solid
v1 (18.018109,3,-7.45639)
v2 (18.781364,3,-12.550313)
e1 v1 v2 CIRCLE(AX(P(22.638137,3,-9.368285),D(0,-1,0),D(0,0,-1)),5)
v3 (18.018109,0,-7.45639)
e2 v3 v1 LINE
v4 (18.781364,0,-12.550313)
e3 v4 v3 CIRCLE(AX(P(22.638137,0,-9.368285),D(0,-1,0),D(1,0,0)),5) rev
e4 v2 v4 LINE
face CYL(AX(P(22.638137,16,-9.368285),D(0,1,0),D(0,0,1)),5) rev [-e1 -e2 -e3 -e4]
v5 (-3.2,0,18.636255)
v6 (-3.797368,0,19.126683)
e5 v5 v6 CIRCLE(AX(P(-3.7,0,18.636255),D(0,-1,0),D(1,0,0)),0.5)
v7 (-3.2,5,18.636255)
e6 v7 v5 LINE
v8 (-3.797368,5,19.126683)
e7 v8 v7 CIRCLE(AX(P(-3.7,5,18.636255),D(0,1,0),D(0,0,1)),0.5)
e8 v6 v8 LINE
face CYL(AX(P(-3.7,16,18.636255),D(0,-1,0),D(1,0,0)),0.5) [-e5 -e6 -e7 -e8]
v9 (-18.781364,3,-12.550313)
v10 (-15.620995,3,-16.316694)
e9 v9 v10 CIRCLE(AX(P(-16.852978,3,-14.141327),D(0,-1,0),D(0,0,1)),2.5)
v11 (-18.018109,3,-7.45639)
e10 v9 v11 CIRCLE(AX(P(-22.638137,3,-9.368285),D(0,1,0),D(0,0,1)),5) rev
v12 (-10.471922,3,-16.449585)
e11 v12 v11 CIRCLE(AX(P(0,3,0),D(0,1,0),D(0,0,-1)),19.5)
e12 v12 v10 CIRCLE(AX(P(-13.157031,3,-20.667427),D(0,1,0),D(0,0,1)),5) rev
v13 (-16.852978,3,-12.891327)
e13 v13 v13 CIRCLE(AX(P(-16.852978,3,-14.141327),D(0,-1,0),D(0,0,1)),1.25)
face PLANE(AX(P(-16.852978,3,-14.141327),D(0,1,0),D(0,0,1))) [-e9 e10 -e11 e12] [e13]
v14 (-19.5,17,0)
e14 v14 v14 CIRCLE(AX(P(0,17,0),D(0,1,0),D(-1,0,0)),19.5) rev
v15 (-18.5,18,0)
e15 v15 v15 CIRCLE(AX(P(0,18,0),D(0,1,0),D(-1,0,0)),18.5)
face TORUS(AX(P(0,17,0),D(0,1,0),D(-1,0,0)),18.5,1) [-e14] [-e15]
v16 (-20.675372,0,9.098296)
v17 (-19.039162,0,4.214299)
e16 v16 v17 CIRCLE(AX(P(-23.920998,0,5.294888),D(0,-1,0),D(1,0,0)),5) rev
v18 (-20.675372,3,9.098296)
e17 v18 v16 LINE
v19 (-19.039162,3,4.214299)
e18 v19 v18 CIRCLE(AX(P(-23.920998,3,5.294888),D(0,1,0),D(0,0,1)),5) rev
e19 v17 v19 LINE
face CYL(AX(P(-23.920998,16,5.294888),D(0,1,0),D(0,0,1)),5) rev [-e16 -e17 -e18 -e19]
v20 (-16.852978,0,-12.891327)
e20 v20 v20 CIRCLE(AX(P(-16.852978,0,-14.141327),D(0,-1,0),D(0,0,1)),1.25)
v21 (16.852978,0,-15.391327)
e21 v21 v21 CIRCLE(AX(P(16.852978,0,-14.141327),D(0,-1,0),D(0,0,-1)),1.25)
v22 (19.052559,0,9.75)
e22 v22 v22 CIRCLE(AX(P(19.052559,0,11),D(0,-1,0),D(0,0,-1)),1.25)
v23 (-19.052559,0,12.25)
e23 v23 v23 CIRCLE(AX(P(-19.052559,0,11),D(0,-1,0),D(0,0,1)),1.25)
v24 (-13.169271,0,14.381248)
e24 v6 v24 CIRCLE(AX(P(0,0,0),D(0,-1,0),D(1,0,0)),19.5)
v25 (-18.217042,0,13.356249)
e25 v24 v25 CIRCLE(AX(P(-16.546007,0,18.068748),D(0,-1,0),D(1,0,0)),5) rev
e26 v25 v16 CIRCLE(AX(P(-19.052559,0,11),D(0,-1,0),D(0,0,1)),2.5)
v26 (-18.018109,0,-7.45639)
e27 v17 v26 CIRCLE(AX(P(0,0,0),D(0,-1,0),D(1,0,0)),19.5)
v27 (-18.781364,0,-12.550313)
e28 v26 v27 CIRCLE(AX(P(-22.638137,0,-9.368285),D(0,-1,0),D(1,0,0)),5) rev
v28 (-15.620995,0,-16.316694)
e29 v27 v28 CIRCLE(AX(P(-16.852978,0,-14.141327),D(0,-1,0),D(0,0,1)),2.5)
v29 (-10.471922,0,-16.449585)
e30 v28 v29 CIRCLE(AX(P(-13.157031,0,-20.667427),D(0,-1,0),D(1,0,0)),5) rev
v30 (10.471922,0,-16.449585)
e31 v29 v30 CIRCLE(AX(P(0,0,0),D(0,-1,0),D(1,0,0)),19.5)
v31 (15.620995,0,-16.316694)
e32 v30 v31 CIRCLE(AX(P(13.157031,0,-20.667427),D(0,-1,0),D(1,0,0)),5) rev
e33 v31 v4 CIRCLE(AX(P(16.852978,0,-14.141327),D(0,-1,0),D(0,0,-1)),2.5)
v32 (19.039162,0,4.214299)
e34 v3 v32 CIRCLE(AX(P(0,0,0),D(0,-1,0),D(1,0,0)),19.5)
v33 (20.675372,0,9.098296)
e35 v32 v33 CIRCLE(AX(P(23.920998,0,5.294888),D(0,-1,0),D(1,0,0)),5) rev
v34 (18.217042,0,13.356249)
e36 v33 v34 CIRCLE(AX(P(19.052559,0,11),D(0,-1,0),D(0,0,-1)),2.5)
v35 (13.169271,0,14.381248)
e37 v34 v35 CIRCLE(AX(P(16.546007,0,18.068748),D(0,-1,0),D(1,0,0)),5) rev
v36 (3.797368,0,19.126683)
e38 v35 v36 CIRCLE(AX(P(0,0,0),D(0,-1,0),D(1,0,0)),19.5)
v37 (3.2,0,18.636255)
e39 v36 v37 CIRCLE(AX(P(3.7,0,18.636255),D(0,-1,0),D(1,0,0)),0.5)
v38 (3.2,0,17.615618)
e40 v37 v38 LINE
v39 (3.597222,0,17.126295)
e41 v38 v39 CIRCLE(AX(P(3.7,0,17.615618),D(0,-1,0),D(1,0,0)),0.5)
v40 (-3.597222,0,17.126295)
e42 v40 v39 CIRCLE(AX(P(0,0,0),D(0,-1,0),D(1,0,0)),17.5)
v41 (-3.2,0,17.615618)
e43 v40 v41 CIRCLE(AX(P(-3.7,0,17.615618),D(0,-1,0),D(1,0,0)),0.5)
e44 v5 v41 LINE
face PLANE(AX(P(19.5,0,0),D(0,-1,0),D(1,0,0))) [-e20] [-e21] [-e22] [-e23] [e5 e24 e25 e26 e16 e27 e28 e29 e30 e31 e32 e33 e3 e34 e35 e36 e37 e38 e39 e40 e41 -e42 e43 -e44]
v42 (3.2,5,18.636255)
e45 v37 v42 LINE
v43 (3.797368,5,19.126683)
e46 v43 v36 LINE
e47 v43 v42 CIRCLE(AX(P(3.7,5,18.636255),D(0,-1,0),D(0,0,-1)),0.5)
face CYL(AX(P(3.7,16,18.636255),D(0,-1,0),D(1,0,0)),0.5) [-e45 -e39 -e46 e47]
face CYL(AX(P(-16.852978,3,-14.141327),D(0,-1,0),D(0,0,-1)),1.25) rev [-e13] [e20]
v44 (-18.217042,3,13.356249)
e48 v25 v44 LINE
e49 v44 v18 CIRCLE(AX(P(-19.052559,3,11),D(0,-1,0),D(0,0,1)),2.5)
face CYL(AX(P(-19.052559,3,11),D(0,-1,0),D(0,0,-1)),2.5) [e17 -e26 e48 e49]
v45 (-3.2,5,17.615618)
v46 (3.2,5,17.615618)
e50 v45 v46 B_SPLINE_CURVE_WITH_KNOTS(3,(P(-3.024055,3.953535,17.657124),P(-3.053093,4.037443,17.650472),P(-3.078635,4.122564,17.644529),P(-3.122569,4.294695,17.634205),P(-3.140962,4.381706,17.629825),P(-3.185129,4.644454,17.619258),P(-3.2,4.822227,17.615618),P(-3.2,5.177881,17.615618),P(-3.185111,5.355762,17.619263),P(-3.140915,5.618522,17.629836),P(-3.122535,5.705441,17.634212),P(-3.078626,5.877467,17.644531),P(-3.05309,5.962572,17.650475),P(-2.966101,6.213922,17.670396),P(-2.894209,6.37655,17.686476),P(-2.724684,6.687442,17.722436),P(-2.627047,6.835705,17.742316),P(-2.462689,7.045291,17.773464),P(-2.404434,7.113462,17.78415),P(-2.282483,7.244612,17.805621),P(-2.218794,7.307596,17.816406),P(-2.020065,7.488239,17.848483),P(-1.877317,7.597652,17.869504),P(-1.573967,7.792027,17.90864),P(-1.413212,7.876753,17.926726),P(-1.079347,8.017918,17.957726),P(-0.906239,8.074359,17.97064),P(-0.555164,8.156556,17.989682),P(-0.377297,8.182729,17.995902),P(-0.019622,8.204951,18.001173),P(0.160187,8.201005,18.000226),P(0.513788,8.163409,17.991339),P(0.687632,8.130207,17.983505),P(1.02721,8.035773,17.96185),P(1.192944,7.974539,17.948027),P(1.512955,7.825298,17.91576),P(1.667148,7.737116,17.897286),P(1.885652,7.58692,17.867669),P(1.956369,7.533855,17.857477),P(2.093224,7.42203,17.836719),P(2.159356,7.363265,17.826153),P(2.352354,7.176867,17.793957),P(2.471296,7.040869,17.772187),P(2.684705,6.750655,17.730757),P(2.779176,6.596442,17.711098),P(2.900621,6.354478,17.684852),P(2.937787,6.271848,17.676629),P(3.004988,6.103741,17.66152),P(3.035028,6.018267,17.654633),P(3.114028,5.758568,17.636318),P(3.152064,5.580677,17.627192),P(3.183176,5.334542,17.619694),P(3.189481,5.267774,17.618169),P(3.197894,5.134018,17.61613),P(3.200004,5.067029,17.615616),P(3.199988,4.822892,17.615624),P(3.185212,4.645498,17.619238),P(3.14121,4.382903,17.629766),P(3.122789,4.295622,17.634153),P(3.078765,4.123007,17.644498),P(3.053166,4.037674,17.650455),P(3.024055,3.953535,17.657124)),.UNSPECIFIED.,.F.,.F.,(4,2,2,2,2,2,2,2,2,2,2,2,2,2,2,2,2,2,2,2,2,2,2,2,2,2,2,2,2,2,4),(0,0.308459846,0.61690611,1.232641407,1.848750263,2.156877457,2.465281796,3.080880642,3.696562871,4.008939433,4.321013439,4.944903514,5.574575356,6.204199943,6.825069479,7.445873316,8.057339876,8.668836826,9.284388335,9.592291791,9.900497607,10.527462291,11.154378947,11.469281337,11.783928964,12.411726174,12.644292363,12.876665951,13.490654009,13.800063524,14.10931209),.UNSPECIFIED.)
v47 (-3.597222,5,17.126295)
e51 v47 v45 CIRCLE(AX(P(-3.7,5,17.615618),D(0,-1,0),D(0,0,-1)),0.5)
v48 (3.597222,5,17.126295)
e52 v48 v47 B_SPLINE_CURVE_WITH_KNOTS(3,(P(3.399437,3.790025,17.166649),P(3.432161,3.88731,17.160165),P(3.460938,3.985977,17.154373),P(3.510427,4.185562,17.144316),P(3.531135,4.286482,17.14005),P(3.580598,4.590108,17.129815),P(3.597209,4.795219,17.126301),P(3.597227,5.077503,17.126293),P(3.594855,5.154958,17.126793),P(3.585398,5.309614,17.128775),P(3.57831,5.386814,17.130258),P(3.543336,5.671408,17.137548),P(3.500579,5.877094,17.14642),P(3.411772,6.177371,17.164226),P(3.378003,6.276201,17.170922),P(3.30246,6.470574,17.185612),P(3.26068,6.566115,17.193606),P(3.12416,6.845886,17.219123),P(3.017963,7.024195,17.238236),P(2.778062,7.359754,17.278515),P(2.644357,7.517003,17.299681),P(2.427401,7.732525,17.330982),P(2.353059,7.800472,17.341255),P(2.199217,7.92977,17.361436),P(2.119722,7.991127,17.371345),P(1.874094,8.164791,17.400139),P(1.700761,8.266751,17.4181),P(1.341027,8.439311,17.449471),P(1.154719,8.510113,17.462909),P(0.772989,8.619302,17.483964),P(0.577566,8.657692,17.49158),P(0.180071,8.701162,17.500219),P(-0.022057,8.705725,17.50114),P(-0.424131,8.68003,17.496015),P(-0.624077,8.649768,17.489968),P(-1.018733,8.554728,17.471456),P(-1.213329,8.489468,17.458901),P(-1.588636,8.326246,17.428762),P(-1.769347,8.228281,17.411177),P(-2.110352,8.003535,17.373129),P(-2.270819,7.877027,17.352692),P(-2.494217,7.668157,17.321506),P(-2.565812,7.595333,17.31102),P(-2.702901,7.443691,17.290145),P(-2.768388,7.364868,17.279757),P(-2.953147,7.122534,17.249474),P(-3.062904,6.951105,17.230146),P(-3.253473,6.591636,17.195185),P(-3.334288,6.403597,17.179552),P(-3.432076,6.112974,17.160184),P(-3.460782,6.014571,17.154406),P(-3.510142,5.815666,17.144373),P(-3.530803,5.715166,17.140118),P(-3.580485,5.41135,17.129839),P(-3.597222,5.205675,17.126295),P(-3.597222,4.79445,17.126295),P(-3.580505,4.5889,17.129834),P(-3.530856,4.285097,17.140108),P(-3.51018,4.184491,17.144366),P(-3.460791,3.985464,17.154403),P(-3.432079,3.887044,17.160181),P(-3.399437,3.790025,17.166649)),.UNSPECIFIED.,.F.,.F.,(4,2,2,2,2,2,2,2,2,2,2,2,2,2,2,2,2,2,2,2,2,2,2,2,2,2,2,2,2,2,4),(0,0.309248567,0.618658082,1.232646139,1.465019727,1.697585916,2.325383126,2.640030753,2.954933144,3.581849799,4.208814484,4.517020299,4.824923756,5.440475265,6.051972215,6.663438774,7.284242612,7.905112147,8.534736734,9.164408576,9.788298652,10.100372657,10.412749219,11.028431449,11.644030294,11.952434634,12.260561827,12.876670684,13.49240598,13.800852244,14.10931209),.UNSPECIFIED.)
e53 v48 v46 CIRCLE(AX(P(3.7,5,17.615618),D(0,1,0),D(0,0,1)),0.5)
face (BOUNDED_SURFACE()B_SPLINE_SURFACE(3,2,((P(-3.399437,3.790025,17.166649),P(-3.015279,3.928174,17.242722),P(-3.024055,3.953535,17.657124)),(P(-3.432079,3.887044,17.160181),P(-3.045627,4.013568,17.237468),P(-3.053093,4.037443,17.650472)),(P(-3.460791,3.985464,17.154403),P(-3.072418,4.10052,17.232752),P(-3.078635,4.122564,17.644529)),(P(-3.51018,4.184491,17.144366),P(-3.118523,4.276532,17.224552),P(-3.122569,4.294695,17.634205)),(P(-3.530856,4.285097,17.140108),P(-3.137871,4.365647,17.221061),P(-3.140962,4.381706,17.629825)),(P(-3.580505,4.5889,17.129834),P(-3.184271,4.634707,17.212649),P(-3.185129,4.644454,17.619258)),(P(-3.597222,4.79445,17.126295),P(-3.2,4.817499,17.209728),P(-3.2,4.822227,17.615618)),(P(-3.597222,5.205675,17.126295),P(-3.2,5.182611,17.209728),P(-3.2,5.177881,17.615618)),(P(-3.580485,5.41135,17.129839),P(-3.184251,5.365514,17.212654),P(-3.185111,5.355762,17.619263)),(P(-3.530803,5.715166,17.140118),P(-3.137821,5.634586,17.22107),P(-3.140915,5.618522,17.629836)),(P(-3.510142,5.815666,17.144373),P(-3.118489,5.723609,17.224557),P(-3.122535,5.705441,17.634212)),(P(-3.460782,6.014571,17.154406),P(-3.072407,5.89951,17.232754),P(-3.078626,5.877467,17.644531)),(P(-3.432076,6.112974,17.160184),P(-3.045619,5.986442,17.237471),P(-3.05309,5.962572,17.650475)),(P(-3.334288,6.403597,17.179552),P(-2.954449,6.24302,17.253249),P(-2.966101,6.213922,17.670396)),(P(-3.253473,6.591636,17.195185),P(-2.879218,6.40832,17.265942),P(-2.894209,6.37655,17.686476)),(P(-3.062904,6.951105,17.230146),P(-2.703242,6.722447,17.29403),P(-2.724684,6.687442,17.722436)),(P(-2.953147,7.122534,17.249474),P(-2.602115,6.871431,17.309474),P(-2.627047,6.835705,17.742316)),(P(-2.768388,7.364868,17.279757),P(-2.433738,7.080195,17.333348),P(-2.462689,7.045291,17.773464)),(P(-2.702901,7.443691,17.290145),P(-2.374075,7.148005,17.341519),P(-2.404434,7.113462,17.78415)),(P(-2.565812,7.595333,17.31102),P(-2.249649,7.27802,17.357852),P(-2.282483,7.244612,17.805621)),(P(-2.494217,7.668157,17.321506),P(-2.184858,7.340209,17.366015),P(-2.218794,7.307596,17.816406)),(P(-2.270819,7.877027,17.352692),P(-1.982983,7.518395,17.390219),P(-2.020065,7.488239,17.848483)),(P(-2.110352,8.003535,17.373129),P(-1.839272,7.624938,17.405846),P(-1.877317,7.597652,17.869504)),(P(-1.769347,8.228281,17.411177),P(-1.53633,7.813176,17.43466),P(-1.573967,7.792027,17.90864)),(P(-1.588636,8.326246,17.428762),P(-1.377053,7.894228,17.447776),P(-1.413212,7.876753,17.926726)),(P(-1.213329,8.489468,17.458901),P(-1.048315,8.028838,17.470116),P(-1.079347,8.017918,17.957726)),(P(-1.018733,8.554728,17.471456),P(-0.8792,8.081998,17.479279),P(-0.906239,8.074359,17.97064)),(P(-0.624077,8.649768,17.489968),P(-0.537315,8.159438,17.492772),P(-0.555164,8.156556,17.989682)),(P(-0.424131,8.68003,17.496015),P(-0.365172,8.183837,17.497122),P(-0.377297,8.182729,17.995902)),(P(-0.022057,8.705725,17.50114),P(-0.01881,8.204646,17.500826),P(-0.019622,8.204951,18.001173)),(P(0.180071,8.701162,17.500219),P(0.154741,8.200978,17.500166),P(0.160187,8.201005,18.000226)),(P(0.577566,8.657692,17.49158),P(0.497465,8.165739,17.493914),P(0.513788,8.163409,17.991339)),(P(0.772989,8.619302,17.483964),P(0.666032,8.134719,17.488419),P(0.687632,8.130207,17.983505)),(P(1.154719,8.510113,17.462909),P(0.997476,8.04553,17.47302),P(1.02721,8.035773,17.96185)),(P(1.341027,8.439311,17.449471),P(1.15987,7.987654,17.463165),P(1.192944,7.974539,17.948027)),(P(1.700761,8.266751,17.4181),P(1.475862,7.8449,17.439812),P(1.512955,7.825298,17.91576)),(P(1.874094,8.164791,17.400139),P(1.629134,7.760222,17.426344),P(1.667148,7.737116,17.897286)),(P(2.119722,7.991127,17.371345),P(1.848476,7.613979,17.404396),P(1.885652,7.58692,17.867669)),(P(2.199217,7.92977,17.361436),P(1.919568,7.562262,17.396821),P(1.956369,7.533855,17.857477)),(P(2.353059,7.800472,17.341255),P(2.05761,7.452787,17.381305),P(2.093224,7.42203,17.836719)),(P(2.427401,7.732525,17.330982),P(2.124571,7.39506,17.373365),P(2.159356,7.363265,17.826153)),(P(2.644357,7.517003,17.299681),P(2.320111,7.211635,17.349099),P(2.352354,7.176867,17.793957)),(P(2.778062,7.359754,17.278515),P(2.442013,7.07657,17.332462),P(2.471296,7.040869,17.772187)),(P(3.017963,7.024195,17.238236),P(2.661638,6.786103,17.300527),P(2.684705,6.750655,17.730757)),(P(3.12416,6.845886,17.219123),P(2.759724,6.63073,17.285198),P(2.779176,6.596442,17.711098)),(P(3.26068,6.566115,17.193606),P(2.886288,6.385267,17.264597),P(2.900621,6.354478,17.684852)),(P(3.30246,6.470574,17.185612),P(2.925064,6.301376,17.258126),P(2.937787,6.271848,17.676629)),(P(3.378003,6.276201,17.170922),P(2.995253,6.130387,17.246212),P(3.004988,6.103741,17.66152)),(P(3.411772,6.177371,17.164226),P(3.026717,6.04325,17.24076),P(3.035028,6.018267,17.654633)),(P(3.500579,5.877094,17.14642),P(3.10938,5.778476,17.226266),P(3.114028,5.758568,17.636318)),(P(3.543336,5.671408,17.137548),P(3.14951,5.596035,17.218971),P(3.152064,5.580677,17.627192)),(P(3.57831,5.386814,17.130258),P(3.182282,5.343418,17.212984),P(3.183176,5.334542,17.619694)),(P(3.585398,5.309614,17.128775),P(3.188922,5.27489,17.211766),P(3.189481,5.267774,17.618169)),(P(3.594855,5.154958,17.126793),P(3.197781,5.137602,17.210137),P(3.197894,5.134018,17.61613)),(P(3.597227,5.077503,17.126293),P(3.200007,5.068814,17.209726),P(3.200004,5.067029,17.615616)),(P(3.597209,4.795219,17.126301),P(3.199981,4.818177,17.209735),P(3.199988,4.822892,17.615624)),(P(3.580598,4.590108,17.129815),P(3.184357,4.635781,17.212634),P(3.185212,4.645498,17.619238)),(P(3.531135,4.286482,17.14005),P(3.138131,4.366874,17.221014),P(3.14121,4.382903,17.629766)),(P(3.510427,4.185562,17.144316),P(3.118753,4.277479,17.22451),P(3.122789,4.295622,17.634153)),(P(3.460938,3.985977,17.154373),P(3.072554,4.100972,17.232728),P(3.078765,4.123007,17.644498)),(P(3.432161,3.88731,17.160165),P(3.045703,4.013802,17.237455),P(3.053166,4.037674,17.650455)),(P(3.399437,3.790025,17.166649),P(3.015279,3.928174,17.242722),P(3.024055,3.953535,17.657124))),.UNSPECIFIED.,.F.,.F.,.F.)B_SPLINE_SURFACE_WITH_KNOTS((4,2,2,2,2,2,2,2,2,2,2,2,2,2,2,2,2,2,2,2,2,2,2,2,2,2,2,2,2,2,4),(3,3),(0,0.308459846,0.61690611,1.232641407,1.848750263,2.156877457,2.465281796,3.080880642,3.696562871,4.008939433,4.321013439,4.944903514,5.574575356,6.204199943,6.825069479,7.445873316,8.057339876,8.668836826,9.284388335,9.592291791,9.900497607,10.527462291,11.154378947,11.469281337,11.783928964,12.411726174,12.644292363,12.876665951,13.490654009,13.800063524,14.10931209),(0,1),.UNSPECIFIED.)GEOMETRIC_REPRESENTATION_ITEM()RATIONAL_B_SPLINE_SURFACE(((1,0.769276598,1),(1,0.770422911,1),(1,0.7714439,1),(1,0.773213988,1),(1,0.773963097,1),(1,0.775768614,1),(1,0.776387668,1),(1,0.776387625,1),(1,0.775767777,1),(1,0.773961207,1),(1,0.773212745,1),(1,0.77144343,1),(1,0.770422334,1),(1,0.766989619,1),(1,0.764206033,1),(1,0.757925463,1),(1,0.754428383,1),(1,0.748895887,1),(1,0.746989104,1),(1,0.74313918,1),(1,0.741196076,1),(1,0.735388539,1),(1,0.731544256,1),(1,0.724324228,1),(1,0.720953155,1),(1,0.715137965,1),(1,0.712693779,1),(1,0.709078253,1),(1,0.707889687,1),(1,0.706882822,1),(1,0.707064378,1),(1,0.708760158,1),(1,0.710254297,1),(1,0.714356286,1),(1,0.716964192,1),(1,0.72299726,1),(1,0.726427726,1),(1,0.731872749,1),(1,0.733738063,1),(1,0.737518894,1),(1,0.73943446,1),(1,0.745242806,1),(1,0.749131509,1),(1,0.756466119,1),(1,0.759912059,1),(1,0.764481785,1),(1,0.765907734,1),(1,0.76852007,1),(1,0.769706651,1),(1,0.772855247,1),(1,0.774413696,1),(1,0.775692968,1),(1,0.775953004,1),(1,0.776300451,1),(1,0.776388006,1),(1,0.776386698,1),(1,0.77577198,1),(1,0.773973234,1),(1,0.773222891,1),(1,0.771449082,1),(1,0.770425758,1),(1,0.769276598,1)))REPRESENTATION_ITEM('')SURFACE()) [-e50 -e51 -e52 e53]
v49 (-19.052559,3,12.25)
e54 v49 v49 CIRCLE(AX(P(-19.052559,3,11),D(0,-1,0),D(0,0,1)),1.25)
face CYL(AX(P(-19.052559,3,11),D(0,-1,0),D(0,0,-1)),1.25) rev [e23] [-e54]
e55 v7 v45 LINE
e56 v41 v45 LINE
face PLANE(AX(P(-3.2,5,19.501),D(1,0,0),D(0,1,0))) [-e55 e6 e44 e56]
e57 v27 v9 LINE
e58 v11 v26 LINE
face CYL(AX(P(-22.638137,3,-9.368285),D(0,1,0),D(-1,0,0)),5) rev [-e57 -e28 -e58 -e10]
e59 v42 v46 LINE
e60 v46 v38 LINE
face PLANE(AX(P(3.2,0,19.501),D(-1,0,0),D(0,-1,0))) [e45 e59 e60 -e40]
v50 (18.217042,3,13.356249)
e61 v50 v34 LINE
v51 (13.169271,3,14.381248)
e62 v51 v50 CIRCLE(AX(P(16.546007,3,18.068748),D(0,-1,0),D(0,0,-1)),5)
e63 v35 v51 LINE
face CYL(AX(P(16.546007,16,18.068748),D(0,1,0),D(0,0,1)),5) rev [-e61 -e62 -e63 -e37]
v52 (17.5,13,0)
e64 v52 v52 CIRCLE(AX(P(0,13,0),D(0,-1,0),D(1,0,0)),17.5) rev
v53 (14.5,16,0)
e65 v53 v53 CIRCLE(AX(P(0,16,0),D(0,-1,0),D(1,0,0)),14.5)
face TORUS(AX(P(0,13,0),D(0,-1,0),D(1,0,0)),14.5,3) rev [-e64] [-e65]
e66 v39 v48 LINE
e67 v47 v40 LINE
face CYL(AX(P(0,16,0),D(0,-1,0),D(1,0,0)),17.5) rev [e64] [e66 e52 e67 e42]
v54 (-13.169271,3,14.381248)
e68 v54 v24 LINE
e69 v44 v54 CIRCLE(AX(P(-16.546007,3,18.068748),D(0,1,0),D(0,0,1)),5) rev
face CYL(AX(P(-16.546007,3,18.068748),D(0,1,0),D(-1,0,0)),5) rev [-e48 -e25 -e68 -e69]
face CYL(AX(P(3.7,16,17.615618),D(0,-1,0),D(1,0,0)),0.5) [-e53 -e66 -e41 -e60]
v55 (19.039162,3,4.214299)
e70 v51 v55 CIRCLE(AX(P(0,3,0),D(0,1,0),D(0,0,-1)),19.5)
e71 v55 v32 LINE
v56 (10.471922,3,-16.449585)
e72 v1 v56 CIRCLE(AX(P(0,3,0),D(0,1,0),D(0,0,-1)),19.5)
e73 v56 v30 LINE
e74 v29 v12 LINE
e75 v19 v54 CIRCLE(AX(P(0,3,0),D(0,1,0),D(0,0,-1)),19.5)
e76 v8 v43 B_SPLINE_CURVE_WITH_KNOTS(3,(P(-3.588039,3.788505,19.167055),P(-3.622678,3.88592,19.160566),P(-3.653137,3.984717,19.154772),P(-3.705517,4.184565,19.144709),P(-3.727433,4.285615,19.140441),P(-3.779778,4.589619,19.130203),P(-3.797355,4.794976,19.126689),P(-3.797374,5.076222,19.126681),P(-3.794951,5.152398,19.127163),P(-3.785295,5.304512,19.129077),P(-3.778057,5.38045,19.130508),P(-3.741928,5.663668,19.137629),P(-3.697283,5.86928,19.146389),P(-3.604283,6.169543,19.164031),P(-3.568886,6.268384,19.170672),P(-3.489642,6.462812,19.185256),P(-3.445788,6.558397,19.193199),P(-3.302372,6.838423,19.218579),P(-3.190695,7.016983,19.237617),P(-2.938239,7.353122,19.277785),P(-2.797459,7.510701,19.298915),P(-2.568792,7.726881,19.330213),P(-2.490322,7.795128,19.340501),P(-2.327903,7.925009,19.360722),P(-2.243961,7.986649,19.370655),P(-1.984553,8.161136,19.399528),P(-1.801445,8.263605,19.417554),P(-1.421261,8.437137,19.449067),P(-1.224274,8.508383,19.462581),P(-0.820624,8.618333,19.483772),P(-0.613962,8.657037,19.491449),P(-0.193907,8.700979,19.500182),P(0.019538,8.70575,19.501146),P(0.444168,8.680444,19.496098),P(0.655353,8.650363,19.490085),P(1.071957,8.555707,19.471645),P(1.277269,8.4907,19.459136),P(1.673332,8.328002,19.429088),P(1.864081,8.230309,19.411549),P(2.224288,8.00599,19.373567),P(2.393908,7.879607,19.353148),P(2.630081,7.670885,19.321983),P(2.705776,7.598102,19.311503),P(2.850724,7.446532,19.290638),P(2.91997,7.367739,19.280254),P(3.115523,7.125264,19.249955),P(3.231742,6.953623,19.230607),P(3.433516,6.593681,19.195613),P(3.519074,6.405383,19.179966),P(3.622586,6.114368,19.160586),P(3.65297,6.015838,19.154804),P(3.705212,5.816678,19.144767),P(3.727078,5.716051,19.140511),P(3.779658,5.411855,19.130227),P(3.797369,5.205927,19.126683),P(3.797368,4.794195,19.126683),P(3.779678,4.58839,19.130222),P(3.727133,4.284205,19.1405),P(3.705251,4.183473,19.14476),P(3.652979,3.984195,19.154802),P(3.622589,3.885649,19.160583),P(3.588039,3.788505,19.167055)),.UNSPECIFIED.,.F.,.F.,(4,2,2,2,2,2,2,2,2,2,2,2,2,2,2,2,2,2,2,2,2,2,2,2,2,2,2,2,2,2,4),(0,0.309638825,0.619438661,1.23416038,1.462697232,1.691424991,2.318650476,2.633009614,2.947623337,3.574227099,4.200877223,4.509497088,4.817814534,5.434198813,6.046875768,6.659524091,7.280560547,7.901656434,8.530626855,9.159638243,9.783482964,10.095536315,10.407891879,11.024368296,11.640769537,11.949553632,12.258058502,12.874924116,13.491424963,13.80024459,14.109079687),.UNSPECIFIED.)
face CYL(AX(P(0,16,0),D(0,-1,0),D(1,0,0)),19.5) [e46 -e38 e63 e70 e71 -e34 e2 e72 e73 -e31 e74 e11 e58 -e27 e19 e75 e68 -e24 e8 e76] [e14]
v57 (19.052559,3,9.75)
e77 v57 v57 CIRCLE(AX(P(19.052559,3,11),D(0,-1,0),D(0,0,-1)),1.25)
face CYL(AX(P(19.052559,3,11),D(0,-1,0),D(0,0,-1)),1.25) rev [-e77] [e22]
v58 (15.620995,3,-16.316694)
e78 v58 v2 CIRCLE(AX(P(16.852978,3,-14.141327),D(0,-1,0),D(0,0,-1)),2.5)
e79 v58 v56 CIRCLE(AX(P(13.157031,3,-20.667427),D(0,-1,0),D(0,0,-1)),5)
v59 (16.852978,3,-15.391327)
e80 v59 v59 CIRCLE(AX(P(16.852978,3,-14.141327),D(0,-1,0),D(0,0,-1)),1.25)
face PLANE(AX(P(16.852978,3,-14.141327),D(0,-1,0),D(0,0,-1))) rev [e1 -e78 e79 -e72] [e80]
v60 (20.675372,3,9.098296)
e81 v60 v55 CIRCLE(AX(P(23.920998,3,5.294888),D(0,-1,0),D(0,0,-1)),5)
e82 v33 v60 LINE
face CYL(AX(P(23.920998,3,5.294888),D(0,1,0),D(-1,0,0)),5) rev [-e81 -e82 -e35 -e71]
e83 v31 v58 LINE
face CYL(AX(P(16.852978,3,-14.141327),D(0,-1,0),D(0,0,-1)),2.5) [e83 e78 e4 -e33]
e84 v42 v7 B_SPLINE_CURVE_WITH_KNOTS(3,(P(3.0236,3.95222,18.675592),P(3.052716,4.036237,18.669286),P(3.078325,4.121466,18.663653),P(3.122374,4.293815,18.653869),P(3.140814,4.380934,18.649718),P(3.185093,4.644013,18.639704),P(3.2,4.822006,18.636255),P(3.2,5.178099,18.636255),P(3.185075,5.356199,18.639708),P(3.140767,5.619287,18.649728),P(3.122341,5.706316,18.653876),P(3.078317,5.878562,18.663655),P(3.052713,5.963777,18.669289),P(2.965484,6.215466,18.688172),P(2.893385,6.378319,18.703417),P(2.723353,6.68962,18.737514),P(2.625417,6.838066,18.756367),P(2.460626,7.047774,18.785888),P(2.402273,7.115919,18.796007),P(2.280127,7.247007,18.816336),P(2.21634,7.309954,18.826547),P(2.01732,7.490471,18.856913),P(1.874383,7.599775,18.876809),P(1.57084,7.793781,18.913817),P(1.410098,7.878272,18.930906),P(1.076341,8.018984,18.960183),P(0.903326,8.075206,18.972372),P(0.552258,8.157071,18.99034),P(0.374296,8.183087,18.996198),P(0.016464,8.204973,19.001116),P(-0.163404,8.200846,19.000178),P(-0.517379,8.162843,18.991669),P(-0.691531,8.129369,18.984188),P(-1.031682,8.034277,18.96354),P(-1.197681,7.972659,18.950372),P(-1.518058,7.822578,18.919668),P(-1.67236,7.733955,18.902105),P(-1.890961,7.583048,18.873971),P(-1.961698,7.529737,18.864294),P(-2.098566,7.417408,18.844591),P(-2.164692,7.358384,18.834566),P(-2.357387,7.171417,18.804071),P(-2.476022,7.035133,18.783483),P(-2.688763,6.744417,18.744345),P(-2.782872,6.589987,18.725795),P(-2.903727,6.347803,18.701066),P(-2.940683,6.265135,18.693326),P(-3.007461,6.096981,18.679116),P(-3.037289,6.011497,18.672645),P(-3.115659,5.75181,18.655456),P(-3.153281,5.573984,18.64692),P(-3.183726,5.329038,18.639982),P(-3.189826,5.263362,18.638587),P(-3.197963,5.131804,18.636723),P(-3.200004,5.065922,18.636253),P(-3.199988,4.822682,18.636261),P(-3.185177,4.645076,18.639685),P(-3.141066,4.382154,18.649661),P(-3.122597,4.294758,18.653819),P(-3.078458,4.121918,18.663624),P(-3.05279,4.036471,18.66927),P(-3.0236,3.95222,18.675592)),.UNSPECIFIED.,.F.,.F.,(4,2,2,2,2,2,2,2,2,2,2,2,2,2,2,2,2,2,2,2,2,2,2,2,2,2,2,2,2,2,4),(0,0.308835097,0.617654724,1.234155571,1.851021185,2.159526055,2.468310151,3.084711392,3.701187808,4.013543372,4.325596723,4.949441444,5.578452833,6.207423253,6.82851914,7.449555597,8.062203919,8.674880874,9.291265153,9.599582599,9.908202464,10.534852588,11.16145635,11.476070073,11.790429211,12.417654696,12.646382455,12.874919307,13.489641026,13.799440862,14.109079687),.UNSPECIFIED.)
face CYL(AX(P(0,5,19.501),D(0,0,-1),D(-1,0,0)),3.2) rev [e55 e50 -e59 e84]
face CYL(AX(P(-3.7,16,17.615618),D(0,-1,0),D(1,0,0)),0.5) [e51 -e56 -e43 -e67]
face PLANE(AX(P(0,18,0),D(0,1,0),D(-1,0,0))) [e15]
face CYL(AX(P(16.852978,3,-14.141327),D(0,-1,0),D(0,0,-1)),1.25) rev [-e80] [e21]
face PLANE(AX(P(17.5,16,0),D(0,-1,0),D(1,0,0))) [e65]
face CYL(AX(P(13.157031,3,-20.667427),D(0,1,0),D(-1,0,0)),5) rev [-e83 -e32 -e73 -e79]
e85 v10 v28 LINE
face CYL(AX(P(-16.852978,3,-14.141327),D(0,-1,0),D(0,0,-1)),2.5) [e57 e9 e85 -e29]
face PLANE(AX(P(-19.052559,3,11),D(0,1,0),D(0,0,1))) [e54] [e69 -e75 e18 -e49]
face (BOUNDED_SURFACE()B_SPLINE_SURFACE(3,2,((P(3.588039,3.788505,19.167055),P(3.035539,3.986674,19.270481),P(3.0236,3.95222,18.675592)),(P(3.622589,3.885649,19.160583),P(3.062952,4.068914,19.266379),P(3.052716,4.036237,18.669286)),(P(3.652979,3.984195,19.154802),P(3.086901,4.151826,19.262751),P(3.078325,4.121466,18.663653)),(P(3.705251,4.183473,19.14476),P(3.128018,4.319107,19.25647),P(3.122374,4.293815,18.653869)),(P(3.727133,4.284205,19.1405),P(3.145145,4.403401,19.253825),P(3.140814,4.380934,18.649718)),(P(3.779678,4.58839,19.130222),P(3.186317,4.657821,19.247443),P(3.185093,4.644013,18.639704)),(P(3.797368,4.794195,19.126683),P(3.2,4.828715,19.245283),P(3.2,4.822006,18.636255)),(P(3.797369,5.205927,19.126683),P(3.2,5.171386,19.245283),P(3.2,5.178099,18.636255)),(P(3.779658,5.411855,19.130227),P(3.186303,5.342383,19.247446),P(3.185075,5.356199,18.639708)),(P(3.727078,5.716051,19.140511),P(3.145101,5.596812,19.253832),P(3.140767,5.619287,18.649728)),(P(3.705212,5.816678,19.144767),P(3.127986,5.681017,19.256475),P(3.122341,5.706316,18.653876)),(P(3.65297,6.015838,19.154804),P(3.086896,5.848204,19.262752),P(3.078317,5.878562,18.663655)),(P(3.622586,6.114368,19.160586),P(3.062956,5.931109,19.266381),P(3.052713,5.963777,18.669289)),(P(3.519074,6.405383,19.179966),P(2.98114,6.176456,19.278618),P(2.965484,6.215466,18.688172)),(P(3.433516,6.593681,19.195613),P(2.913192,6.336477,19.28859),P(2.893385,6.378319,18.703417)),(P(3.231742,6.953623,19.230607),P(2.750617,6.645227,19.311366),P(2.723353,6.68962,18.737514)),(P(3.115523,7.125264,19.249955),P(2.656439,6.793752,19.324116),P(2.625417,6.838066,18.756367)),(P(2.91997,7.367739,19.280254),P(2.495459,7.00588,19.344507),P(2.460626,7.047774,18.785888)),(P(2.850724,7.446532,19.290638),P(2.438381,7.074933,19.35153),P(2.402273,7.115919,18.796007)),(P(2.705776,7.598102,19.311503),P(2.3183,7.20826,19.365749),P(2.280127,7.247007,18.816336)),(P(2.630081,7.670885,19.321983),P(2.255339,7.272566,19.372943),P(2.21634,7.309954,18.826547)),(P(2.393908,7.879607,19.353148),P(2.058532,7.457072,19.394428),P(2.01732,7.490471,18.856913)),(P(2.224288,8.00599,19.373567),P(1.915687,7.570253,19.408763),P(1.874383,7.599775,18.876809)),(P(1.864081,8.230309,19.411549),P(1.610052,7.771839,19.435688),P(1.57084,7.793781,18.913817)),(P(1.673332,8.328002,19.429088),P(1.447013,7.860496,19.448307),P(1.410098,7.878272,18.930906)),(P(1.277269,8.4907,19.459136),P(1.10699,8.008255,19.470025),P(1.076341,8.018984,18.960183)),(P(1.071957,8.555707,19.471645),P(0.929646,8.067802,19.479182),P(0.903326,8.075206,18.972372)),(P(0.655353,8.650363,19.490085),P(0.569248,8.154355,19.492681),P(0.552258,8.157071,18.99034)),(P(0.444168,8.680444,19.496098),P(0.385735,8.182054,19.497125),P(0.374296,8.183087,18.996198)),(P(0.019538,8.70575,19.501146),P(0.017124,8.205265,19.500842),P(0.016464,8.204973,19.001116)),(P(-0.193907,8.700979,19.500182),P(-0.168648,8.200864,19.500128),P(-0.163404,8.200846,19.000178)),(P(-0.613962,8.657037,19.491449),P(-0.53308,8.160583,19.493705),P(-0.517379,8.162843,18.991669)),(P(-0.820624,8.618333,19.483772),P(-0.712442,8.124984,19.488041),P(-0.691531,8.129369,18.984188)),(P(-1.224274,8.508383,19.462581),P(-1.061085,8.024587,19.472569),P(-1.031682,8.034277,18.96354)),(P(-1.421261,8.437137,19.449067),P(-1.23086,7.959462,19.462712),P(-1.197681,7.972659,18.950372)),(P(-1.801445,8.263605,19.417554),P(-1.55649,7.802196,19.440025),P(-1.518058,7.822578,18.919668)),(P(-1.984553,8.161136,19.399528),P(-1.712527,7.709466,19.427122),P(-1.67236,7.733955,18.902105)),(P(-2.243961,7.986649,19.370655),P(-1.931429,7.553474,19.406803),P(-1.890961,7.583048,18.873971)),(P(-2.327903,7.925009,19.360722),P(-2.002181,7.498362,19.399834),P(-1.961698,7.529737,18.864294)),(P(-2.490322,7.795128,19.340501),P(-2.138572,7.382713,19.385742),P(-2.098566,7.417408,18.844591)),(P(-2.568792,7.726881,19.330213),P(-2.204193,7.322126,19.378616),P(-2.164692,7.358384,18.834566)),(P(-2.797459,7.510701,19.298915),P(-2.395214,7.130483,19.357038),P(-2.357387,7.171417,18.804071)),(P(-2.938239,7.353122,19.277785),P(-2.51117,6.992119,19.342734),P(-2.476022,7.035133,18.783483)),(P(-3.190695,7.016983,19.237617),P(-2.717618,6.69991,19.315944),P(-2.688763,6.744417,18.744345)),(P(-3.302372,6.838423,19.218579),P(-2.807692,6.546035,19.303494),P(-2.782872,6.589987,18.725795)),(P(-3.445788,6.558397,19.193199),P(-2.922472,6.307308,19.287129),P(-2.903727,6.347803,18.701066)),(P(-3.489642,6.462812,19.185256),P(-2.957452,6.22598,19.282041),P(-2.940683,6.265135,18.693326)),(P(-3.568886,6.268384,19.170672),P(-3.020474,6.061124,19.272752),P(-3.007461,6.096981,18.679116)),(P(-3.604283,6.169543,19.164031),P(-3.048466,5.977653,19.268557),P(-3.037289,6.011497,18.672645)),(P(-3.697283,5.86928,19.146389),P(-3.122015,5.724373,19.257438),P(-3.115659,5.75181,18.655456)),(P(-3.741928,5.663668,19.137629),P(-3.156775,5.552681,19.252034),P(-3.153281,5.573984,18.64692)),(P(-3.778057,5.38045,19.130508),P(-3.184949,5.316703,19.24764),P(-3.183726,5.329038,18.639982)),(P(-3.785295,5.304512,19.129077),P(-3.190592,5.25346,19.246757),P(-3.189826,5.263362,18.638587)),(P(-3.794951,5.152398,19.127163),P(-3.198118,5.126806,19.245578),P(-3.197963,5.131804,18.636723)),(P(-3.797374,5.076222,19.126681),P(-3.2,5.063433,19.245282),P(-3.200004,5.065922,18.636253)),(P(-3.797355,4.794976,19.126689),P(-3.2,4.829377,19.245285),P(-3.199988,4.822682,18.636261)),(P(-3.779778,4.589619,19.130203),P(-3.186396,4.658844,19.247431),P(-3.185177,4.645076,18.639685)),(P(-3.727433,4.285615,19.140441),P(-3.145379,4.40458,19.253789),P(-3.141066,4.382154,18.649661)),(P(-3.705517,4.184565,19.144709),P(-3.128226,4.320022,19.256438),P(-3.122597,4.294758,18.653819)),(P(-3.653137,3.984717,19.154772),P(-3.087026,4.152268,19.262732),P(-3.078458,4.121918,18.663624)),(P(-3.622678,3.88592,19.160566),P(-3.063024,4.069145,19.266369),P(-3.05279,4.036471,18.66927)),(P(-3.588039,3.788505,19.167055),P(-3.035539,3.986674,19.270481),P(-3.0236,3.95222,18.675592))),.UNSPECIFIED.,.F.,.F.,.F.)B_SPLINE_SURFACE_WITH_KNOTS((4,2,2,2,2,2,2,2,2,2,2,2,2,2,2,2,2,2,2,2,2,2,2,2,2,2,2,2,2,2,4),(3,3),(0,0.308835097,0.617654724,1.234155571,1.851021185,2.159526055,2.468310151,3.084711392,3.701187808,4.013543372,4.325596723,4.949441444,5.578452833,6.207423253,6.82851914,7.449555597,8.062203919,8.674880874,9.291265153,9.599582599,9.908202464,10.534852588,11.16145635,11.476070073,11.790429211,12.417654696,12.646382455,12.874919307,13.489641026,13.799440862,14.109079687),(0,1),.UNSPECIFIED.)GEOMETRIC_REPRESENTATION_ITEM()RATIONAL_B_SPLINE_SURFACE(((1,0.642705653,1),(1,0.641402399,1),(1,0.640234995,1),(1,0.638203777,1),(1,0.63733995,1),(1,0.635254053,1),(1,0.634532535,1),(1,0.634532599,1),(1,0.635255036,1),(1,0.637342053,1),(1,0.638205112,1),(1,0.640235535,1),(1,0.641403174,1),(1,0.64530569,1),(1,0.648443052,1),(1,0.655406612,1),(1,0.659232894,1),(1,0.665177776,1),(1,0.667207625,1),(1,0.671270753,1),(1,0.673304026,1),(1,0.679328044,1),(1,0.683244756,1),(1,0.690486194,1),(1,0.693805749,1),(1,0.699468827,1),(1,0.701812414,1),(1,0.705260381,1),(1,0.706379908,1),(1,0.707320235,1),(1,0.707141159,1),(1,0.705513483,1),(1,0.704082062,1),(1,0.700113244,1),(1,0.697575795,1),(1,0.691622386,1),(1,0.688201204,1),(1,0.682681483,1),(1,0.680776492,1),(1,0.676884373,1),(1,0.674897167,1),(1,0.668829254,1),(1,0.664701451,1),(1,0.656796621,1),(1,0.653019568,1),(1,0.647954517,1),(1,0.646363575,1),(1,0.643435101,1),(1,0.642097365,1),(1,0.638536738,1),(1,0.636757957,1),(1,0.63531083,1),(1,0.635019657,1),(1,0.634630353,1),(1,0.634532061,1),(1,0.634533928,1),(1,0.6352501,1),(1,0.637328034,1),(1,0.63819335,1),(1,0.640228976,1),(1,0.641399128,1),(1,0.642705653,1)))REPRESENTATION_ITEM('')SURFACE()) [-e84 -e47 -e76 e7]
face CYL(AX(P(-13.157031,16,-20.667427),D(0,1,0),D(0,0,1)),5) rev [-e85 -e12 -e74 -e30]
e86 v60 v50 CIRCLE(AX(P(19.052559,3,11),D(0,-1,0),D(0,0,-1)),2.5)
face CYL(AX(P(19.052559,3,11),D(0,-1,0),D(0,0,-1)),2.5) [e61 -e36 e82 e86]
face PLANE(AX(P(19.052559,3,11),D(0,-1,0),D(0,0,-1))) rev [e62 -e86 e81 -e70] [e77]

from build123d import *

# Parameters (mm, degrees)
SKETCH_2_R                  = 1.25
EXTRUDE_1491_DEPTH          = 3
FILLET_2_R                  = 3
FILLET_1631_R               = 5
CUT_EXTRUDE_2422_REACH      = 36.187
CUT_EXTRUDE_2422_END_RADIUS = 19.5
FILLET_4_R                  = 0.5
FILLET_5_R                  = 1


with BuildPart() as part:
    # Эскиз1 → Повернуть1 (revolve)
    with BuildSketch(Plane.XY):
        Polygon((0, 16), (0, 18), (19.5, 18), (19.5, 0), (17.5, 0), (17.5, 16), align=None)
    revolve(axis=Axis((0, 16, 0), (0, 1, 0)))

    # Эскиз2 → Extrude 1491 (add)
    # profile 1 of 4: a face of its own
    with BuildSketch(Plane.XZ):
        with BuildLine():
            Line((15.246008724, -16.056438521), (13.207625443, -14.346031861))
            ThreePointArc((13.207625443, -14.346031861), (14.937866641, -12.534358389), (16.421563491, -10.515809646))
            Line((16.421563491, -10.515809646), (18.459946773, -12.226216305))
            ThreePointArc((18.459946773, -12.226216305), (18.768088856, -15.748296437), (15.246008724, -16.056438521))
        make_face()
        with Locations(Location((16.852977749, -14.141327413, 0), (0, 0, 270))):
            Circle(SKETCH_2_R, mode=Mode.SUBTRACT)
    # profile 2 of 4: a face of its own
    with BuildSketch(Plane.XZ):
        with BuildLine():
            Line((-18.459946773, -12.226216305), (-16.421563491, -10.515809646))
            ThreePointArc((-16.421563491, -10.515809646), (-14.937866641, -12.534358389), (-13.207625443, -14.346031861))
            Line((-13.207625443, -14.346031861), (-15.246008724, -16.056438521))
            ThreePointArc((-15.246008724, -16.056438521), (-18.768088856, -15.748296437), (-18.459946773, -12.226216305))
        make_face()
        with Locations(Location((-16.852977749, -14.141327413, 0), (0, 0, 90))):
            Circle(SKETCH_2_R, mode=Mode.SUBTRACT)
    # profile 3 of 4: a face of its own
    with BuildSketch(Plane.XZ):
        with BuildLine():
            Line((17.802558883, 13.165063509), (15.498134224, 11.834603312))
            ThreePointArc((15.498134224, 11.834603312), (16.887495374, 9.75), (17.998134224, 7.504476293))
            Line((17.998134224, 7.504476293), (20.302558883, 8.834936491))
            ThreePointArc((20.302558883, 8.834936491), (21.217622393, 12.25), (17.802558883, 13.165063509))
        make_face()
        with Locations(Location((19.052558883, 11, 0), (0, 0, 270))):
            Circle(SKETCH_2_R, mode=Mode.SUBTRACT)
    # profile 4 of 4: a face of its own
    with BuildSketch(Plane.XZ):
        with BuildLine():
            Line((-20.302558883, 8.834936491), (-17.998134224, 7.504476293))
            ThreePointArc((-17.998134224, 7.504476293), (-16.887495374, 9.75), (-15.498134224, 11.834603312))
            Line((-15.498134224, 11.834603312), (-17.802558883, 13.165063509))
            ThreePointArc((-17.802558883, 13.165063509), (-21.217622393, 12.25), (-20.302558883, 8.834936491))
        make_face()
        with Locations(Location((-19.052558883, 11, 0), (0, 0, 90))):
            Circle(SKETCH_2_R, mode=Mode.SUBTRACT)
    extrude(amount=-EXTRUDE_1491_DEPTH)

    # Скругление2
    fillet_2_edges = [part.edges().sort_by_distance(p)[0] for p in [
        (-17.5, 16, 0),
    ]]
    fillet(fillet_2_edges, radius=FILLET_2_R)

    # Fillet 1631
    # the kernel refuses this fillet: 5 mm, written as the material it adds along each edge
    with BuildSketch(Plane(origin=(15.498134224, 0, 11.834603312), x_dir=(-0.6748484545014423, 0, 0.7379563425142538), z_dir=(0, 1, 0)), Plane(origin=(16.421563491, 0, -10.515809646), x_dir=(0.46264036439110967, 0, 0.8865460468785934), z_dir=(0, 1, 0)), Plane(origin=(-13.207625443, 0, -14.346031861), x_dir=(0.7927407641766817, 0, -0.6095589231670477), z_dir=(0, 1, 0)), Plane(origin=(-17.998134224, 0, 7.504476293), x_dir=(-0.301664712250469, 0, -0.9534140765600442), z_dir=(0, 1, 0))) as fillet_1631_piece_1:
        with BuildLine():
            CenterArc((3.893371259, 4.980387232), FILLET_1631_R, 202.918064629, 62.005438268)
            Line((-0.711942111, 3.033315388), (-1.172473448, 2.838608203))
            ThreePointArc((-1.172473448, 2.838608203), (-1.061572462, 2.490694934), (-0.488256583, -0.107728867))
            Line((-0.488256583, -0.107728867), (0.044242855, -0.498038723))
            ThreePointArc((0.044242855, -0.498038723), (1.725471354, -0.423510203), (3.406699852, -0.498038723))
            Line((3.406699852, -0.498038723), (3.450942707, 0))
        make_face()
    extrude(amount=3)
    with BuildSketch(Plane(origin=(17.998134224, 0, 7.504476293), x_dir=(0.3016647122504697, 0, -0.953414076560044), z_dir=(0, 1, 0)), Plane(origin=(13.207625443, 0, -14.346031861), x_dir=(-0.7927407641766814, 0, -0.609558923167048), z_dir=(0, 1, 0)), Plane(origin=(-16.421563491, 0, -10.515809646), x_dir=(-0.46264036439110884, 0, 0.886546046878594), z_dir=(0, 1, 0)), Plane(origin=(-15.498134224, 0, 11.834603312), x_dir=(0.674848454501442, 0, 0.7379563425142541), z_dir=(0, 1, 0))) as fillet_1631_piece_2:
        with BuildLine():
            CenterArc((3.893371259, -4.980387232), FILLET_1631_R, 95.076497103, 62.005438268)
            Line((-0.711942111, -3.033315388), (-1.172473448, -2.838608203))
            ThreePointArc((-1.172473448, -2.838608203), (-1.061572462, -2.490694934), (-0.488256583, 0.107728867))
            Line((-0.488256583, 0.107728867), (0.044242855, 0.498038723))
            ThreePointArc((0.044242855, 0.498038723), (1.725471354, 0.423510203), (3.406699852, 0.498038723))
            Line((3.406699852, 0.498038723), (3.450942707, 0))
        make_face()
    extrude(amount=3)

    # Cut-Extrude 2422: up to this cylinder (the profile starts inside it)
    cut_extrude_2422_end = Plane(origin=(0, 3.790585, 0), z_dir=(0, -1, 0)) * Cylinder(CUT_EXTRUDE_2422_END_RADIUS, 112.374, mode=Mode.PRIVATE)
    # Эскиз4 → Cut-Extrude 2422 (cut, up to the surface)
    with BuildSketch(Plane.XY, mode=Mode.PRIVATE) as cut_extrude_2422_sk1:
        with BuildLine():
            Line((-3.2, 5), (-3.2, 0))
            Line((-3.2, 0), (3.2, 0))
            Line((3.2, 0), (3.2, 5))
            ThreePointArc((3.2, 5), (0, 8.2), (-3.2, 5))
        make_face()
    cut_extrude_2422_tool1 = extrude(cut_extrude_2422_sk1.sketch, amount=CUT_EXTRUDE_2422_REACH, mode=Mode.PRIVATE) & cut_extrude_2422_end
    add(cut_extrude_2422_tool1.solids().sort_by_distance((0, 3.790585, 0))[0], mode=Mode.SUBTRACT)

    # Скругление4
    fillet_4_edges = [part.edges().sort_by_distance(p)[0] for p in [
        (1e-09, 8.200000026, 19.49999998),
        (-3.2, 2.5, 19.235643998),
        (3.2, 2.5, 19.235643998),
        (-3.2, 2.5, 17.204941151),
        (-3e-09, 8.200000027, 17.499999979),
        (3.2, 2.5, 17.204941151),
    ]]
    fillet(fillet_4_edges, radius=FILLET_4_R)

    # Скругление5
    fillet_5_edges = [part.edges().sort_by_distance(p)[0] for p in [
        (-19.5, 18, 0),
    ]]
    fillet(fillet_5_edges, radius=FILLET_5_R)


solid = part.part
